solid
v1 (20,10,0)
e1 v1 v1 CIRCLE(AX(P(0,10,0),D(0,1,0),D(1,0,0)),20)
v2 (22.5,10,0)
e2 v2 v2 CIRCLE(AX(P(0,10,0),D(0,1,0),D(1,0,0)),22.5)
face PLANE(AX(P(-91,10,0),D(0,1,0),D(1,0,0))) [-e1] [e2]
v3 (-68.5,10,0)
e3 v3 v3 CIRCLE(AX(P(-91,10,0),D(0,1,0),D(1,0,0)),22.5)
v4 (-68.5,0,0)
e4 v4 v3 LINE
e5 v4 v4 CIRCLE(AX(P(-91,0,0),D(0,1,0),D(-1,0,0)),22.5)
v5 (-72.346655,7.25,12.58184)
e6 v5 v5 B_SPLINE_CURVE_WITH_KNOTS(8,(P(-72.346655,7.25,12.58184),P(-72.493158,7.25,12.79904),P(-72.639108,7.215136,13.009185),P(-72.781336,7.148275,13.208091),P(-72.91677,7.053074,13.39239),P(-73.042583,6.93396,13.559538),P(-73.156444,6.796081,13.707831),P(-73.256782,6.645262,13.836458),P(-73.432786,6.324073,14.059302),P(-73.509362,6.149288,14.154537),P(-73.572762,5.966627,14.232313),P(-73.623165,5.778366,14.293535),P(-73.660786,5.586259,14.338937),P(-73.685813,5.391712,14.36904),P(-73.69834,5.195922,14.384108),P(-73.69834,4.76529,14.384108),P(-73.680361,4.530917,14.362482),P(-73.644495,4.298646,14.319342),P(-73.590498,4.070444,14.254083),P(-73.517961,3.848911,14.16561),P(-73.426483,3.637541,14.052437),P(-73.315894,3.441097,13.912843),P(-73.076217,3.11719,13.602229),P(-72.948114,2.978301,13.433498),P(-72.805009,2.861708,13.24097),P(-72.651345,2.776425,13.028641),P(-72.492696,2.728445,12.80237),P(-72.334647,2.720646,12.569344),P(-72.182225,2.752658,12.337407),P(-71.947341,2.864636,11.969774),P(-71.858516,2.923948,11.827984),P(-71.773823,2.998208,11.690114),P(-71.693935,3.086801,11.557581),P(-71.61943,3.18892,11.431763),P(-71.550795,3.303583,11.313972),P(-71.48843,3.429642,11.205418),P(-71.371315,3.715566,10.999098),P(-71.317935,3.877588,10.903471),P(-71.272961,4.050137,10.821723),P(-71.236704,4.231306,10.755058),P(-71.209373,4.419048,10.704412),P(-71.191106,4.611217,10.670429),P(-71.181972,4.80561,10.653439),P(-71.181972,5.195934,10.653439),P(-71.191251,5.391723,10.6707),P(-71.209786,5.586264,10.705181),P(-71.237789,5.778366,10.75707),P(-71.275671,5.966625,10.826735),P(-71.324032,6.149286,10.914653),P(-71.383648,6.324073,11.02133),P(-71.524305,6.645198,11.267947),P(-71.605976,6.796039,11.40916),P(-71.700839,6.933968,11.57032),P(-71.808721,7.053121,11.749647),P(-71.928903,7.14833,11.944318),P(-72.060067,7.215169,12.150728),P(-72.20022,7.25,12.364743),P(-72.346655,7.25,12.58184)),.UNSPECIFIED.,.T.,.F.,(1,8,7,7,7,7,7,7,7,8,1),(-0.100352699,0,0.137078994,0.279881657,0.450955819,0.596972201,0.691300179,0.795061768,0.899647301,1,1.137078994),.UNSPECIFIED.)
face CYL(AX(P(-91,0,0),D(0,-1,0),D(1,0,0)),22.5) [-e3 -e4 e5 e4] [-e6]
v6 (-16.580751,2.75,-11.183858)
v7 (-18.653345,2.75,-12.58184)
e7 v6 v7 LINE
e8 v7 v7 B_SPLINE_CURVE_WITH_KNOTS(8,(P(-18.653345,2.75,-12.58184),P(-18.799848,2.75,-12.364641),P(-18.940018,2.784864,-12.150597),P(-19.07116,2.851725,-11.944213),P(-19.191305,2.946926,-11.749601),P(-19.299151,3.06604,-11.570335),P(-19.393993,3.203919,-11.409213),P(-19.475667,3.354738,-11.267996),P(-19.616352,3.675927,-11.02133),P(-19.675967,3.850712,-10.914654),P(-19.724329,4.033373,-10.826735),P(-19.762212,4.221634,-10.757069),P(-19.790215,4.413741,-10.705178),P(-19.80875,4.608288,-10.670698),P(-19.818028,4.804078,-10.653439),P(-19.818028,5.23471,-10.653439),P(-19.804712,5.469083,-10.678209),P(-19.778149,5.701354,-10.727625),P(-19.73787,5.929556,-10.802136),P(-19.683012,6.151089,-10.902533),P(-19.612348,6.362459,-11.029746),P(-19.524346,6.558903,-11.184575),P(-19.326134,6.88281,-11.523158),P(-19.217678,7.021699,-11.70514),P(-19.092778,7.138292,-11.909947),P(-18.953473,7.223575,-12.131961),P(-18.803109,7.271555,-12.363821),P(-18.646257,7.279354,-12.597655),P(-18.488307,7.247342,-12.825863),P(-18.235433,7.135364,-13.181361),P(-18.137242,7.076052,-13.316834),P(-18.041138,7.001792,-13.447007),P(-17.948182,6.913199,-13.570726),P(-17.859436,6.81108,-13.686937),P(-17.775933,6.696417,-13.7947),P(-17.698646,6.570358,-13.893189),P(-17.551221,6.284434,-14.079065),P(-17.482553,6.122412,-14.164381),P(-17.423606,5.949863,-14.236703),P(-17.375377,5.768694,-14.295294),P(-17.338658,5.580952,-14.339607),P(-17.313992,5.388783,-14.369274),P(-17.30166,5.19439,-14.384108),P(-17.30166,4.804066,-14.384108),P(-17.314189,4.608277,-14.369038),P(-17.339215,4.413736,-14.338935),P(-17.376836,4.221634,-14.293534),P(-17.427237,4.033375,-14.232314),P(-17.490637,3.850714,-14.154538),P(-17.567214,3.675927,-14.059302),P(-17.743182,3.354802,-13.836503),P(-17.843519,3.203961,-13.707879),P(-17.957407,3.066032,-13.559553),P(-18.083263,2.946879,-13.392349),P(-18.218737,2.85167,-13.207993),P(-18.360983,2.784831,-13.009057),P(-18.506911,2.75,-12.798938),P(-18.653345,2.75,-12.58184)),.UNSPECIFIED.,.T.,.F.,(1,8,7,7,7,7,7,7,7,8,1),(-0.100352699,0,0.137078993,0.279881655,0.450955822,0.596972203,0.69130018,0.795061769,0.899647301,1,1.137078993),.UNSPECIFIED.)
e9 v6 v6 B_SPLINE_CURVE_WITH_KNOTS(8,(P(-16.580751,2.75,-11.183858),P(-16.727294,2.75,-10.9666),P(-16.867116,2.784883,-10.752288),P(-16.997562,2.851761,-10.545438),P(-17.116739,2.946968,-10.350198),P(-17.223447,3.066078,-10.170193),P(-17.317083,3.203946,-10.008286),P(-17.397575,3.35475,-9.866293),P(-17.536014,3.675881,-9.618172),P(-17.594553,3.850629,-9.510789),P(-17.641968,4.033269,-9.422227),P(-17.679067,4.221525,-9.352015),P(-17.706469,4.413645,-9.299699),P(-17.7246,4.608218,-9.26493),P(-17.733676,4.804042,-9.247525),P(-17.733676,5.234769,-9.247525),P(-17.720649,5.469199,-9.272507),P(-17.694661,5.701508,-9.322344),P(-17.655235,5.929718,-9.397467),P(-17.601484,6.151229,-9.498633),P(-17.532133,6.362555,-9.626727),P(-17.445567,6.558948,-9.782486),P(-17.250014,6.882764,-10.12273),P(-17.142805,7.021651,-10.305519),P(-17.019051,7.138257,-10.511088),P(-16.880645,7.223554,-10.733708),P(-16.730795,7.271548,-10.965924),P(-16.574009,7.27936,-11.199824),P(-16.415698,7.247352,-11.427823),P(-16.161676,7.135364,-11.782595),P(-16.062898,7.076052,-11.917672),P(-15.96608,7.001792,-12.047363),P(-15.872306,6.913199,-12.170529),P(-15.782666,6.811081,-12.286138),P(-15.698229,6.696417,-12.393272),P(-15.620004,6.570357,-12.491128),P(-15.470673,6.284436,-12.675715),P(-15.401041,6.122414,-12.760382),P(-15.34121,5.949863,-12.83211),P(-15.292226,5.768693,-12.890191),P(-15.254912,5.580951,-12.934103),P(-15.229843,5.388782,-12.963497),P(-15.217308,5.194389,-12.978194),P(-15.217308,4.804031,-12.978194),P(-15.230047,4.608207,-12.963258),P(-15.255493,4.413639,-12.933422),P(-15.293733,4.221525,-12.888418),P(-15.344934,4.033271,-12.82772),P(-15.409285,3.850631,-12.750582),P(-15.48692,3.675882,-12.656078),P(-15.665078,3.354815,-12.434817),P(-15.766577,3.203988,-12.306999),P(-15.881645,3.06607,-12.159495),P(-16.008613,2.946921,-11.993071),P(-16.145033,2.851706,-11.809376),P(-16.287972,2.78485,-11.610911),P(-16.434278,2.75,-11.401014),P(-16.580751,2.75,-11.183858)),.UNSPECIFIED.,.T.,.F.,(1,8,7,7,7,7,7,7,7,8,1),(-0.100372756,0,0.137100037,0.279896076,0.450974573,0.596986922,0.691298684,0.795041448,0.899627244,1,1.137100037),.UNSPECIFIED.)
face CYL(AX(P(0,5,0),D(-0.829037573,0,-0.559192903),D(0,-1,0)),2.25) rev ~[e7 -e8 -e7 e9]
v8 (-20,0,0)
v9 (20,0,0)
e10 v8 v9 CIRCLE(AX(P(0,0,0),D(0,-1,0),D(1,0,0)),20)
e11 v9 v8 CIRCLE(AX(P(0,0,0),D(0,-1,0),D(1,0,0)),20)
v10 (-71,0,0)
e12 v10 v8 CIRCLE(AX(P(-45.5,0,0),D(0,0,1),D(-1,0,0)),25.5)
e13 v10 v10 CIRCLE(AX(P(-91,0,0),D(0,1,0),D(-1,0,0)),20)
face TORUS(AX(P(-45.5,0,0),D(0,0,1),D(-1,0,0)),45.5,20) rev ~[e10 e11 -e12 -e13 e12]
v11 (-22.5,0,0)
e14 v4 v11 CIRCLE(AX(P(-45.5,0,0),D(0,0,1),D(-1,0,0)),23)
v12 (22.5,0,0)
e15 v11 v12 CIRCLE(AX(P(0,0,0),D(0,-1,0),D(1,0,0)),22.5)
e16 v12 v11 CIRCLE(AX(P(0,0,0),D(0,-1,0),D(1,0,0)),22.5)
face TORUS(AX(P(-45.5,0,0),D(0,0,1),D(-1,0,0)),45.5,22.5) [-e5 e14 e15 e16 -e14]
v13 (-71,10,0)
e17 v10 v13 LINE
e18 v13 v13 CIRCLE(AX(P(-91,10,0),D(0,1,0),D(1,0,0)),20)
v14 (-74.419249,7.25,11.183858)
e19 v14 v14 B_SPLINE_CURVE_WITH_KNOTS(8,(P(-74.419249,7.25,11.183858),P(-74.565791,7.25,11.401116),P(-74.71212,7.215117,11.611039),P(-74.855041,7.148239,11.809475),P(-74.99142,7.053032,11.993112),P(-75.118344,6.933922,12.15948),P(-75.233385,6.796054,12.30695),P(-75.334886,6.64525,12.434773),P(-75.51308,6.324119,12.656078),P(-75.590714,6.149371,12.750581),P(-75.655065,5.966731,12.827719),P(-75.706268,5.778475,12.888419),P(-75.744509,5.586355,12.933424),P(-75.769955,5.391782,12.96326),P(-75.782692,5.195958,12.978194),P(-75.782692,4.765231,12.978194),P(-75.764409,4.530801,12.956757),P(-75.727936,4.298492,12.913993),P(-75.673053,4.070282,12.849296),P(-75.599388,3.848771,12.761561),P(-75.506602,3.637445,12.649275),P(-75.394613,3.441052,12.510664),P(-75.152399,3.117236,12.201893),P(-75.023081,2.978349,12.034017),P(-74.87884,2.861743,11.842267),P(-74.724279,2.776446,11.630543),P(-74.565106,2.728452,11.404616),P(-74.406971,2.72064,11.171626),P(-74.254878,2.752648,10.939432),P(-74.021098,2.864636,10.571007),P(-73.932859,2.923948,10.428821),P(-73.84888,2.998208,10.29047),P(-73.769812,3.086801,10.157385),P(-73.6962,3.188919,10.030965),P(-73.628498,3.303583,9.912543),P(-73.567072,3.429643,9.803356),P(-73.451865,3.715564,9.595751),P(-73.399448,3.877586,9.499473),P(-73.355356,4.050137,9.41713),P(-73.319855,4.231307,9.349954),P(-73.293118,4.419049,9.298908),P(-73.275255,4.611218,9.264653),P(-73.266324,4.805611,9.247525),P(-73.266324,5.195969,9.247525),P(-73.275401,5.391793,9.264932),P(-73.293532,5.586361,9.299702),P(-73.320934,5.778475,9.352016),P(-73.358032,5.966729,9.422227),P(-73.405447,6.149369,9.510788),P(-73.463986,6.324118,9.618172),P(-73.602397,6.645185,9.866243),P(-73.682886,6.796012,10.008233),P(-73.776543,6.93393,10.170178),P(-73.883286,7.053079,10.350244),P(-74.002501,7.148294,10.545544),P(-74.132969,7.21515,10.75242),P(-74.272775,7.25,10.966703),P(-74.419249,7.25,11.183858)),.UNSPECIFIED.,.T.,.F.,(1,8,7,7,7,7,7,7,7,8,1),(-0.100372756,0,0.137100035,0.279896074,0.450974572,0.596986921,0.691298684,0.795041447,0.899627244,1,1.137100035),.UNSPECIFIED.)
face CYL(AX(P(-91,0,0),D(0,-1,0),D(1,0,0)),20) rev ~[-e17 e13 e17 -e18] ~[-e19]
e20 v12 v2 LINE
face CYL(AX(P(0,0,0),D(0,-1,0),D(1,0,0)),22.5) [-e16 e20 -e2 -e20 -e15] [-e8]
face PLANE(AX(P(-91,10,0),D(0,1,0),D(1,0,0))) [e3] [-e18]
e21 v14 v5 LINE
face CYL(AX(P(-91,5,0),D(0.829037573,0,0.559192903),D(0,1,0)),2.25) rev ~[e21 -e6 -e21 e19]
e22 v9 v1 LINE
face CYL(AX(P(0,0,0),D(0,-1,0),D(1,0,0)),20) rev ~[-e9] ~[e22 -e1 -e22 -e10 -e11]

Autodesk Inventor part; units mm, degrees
ref_plane "XZ Plane" through (0, 0, 0) normal (0, 1, 0) x (-1, 0, 0)
ref_plane "XY Plane" through (0, 0, 0) normal (0, 0, 1) x (1, 0, 0)
sketch "Sketch1" plane through (0, 0, 0) normal (0, 1, 0) x (-1, 0, 0)
  circle A0 centre (0, 0) radius 20
  circle A1 centre (0, 0) radius 22.5
  dimension "d0" = 40
  dimension "d1" = 45
sketch "Sketch2" plane through (0, 0, 0) normal (0, 0, 1) x (1, 0, 0)
  arc A0 (-91, 0) -> (0, 0) centre (-45.5, 0) ccw
  dimension "d34" = 91
sweep "Sweep2" add profiles "Sketch1" path "Sketch2"
sketch "Sketch3" plane through (-91, 0, 0) normal (0, 1, 0) x (1, 0, 0)
  circle A0 centre (0, 0) radius 20 projected
  circle A1 centre (0, 0) radius 22.5 projected
  circle A2 centre (91, 0) radius 20 projected
  circle A3 centre (91, 0) radius 22.5 projected
extrude "Extrusion1" add sketch "Sketch3" along normal blind 10
ref_plane "Work Plane1" through (0, 0, 0) normal (0.8290376, 0, 0.5591929) x (0, 1, 0)
sketch "Sketch4" plane through (0, 0, 0) normal (0.8290376, 0, 0.5591929) x (0, 1, 0)
  line L0 (10, -22.5) -> (10, 22.5) projected
  line L1 (0, 22.5) -> (0, -22.5) projected
  point P0 (0, 0)
  point P1 (5, 0)
  dimension "d14" = 5
  dimension "d15" = 22.5
  dimension "d16" = 22.5
hole "Hole1" at (0, 5, 0) direction (-0.8290376, 0, -0.5591929) diameter 4.5 end up to surface
sketch "Sketch5" plane through (-91, 10, 0) normal (0, 1, 0) x (1, 0, 0)
  point P0 (91, 0)
  point P1 (0, 0)
  point P2 (0, 0)
ref_plane "Work Plane2" through (-91, 10, 0) normal (0.8290376, 0, 0.5591929) x (0, 1, 0)
sketch "Sketch6" plane through (-91, 10, 0) normal (0.8290376, 0, 0.5591929) x (0, 1, 0)
  line L0 (0, -22.5) -> (0, 22.5) projected
  line L1 (-10, -22.5) -> (-10, 22.5) projected
  line L2 (-10, -22.5) -> (0, -22.5) projected
  line L3 (-10, 22.5) -> (0, 22.5) projected
  point P0 (-10, -50.8866)
  point P1 (-5, 0)
  dimension "d24" = 5
  dimension "d25" = 22.5
  dimension "d26" = 22.5
hole "Hole2" at (-91, 5, 0) direction (0.8290376, 0, 0.5591929) diameter 4.5 end up to surface
equation "\"d15\" = d16"
equation "\"d25\" = d26"
properties part number "Pancake_Flexi Pipe Flipped" material "PMMA Plastic"
